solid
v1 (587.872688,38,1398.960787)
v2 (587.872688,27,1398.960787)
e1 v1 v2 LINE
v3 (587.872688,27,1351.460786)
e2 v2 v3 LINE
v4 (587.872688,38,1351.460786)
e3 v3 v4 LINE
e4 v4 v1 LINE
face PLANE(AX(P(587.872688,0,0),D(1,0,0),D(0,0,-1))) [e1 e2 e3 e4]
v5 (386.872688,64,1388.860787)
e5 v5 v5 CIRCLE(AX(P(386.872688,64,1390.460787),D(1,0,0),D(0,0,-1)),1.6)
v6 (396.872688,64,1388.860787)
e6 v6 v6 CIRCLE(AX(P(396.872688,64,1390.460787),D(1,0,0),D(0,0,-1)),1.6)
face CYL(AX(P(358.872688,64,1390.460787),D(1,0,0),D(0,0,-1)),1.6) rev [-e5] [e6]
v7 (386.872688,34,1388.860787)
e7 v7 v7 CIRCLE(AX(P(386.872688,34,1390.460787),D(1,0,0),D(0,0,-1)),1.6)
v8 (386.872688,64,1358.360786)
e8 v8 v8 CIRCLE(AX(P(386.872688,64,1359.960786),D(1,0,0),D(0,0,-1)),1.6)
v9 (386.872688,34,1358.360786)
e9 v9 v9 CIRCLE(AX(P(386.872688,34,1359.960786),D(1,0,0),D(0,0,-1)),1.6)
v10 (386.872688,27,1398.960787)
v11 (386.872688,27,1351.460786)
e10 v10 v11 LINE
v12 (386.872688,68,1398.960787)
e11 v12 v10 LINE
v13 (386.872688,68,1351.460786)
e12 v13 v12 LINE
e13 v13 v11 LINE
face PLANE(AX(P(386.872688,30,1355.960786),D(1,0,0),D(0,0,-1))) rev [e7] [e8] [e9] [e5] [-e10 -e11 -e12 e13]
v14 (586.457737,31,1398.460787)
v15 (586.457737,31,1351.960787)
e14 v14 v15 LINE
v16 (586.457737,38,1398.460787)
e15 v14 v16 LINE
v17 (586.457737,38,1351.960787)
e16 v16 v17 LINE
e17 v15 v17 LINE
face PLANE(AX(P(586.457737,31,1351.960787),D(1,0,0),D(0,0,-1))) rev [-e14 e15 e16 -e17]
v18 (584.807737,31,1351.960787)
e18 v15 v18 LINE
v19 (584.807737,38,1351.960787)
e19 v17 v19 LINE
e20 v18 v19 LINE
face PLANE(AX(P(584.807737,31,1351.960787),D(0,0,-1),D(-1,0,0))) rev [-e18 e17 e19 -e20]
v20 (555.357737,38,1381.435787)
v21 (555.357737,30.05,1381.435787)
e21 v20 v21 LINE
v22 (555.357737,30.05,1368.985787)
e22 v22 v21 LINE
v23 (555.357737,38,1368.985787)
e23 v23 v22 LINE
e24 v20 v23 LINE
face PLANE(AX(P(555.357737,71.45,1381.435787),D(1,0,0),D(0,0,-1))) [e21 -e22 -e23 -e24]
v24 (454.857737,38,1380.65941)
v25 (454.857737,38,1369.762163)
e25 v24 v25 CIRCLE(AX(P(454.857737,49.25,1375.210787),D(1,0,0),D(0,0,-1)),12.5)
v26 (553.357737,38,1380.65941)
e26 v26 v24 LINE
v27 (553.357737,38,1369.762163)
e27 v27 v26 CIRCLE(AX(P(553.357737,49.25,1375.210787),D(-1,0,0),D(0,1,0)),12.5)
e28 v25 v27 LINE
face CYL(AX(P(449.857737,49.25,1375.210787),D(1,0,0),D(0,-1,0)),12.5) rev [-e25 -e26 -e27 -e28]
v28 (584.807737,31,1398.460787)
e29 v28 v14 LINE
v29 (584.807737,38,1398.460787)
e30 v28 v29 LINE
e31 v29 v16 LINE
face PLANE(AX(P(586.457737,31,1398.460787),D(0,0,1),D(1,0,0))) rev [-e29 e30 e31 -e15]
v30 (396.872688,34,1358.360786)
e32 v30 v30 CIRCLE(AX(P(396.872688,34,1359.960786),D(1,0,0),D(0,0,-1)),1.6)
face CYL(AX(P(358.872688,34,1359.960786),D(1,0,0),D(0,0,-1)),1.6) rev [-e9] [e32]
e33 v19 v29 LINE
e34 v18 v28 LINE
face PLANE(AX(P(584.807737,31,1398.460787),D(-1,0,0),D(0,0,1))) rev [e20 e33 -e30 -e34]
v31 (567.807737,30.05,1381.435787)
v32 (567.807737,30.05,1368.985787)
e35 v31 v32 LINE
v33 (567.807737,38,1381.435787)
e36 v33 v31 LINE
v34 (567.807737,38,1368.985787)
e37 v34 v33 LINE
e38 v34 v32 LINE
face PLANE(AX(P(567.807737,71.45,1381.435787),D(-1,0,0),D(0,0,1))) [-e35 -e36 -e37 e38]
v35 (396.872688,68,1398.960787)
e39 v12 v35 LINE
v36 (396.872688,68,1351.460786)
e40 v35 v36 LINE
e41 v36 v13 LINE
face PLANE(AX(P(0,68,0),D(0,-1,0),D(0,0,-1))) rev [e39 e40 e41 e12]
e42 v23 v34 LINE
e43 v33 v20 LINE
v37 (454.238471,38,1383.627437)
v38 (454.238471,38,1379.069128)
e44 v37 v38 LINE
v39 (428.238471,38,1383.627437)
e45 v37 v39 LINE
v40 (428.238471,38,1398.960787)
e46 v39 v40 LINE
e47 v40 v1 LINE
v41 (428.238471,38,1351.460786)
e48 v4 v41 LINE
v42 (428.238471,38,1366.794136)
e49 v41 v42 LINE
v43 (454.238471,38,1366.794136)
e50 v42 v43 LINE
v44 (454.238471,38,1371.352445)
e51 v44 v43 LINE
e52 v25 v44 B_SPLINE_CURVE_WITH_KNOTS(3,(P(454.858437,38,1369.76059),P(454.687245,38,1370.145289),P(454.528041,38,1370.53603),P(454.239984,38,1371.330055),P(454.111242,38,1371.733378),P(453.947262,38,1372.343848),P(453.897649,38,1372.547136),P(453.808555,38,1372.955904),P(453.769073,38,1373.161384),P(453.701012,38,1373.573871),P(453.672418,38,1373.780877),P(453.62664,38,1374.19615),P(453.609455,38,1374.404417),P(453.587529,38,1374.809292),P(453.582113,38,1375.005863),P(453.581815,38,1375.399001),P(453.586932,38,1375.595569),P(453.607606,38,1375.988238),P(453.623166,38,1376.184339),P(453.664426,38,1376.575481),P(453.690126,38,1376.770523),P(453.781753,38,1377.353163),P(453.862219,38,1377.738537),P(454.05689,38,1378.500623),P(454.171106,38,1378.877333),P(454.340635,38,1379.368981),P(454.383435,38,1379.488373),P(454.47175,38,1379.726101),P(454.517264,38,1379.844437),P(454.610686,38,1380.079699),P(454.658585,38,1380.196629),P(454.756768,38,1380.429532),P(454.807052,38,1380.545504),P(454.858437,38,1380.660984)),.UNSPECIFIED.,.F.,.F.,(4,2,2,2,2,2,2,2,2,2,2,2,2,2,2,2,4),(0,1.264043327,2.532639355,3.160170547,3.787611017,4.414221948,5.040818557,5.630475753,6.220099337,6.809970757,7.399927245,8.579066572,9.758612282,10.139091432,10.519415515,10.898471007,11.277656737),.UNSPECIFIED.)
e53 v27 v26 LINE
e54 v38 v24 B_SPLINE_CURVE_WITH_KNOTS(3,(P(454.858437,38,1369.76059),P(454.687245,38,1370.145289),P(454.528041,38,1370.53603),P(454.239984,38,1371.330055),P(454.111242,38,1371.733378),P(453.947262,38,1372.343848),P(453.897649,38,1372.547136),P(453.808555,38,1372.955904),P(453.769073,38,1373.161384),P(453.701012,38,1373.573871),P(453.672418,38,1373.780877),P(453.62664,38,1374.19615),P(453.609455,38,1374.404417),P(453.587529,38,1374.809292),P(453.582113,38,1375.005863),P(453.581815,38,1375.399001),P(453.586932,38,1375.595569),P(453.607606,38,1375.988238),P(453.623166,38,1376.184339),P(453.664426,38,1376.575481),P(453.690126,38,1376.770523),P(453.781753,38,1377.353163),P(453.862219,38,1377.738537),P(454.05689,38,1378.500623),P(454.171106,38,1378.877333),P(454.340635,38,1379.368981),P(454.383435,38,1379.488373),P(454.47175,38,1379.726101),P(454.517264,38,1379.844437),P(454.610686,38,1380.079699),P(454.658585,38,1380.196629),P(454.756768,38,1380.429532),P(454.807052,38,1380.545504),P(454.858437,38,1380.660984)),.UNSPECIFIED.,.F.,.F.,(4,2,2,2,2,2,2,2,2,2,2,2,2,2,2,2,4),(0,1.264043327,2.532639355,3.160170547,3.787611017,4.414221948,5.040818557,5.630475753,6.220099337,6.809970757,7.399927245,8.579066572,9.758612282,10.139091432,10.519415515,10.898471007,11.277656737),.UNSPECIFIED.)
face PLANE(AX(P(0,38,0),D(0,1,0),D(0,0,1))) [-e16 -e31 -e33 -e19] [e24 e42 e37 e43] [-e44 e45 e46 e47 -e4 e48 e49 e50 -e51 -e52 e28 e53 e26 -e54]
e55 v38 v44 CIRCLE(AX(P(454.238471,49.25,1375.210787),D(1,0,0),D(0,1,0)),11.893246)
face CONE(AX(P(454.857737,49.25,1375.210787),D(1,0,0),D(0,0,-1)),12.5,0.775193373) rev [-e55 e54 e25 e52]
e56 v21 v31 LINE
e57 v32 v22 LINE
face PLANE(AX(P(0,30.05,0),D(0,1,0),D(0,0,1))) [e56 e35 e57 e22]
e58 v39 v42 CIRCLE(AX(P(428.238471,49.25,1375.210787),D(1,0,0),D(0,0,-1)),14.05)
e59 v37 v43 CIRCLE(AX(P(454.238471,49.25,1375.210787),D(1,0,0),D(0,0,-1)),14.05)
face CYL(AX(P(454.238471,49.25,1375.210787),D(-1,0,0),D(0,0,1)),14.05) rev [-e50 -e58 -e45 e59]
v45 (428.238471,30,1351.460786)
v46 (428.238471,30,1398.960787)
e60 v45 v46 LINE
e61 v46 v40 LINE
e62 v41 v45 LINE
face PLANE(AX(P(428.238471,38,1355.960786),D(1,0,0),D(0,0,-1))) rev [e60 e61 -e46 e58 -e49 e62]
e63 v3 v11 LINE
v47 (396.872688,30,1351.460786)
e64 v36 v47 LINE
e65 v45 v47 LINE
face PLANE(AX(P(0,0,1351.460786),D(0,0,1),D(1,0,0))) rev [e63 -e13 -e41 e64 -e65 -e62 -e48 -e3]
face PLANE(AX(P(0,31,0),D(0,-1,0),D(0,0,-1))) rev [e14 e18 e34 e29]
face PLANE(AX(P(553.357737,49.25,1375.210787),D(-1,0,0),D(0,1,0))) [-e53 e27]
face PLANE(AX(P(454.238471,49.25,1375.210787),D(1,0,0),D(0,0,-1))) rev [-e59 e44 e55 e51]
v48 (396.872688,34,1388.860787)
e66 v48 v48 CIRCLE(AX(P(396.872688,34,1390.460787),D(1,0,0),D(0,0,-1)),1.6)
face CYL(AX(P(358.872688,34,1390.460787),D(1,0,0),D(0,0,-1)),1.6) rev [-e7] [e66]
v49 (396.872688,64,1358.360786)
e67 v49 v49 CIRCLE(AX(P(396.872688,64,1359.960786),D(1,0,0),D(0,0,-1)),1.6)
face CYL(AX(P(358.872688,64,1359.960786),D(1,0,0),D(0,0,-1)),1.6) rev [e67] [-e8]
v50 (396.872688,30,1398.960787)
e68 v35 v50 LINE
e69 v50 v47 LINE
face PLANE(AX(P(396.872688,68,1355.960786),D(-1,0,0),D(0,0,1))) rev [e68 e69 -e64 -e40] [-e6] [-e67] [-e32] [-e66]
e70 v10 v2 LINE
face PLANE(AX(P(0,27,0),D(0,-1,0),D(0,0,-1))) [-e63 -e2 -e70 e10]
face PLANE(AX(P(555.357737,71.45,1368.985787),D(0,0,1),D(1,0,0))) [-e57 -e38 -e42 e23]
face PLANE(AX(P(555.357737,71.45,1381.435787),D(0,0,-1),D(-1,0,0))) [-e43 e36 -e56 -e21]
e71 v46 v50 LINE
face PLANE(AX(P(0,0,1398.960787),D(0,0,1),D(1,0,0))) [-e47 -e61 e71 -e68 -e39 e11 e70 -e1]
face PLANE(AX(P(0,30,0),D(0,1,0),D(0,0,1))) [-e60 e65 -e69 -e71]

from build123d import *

# Parameters (mm, degrees)
SKETCH1_W               = 226
SKETCH1_H               = 84
BOSS_EXTRUDE1_DEPTH     = 20
SKETCH9_W               = 215
SKETCH9_H               = 38.50000016
BOSS_EXTRUDE2_DEPTH     = 10
SKETCH12_W              = 10
SKETCH12_H              = 38.50000016
BOSS_EXTRUDE4_DEPTH     = 38
SKETCH14_R              = 1.6
CUT_EXTRUDE2_DEPTH      = 38
SKETCH18_W              = 173.6342166
SKETCH18_H              = 38.50000016
BOSS_EXTRUDE5_DEPTH     = 8
SKETCH20_W              = 226
SKETCH20_H              = 20
BOSS_EXTRUDE6_DEPTH     = 27.35
SKETCH20_4_W            = 226
SKETCH20_4_H            = 20
CUT_EXTRUDE3_DEPTH      = 27.35
SKETCH22_W              = 226
SKETCH22_H              = 20
CUT_EXTRUDE4_DEPTH      = 18.14670137
SKETCH23_W              = 38.50329863
SKETCH23_H              = 20
CUT_EXTRUDE5_DEPTH      = 11
SKETCH24_W              = 215
SKETCH24_H              = 38.50329863
CUT_EXTRUDE6_DEPTH      = 27
SKETCH27_W              = 31.3657834
SKETCH27_H              = 3
BOSS_EXTRUDE8_DEPTH     = 4.5
SKETCH28_W              = 31.3657834
SKETCH28_H              = 3
BOSS_EXTRUDE9_DEPTH     = 4.5
CUT_EXTRUDE9_DEPTH      = 5
CUT_EXTRUDE9_DEPTH_BACK = 14
SKETCH30_W              = 47.50000016
SKETCH30_H              = 11
CAVITY2_START           = 555.357736953
CAVITY2_DEPTH           = 12.45
CAVITY2_2_OUTLINE_W     = 9.75
CAVITY2_2_OUTLINE_H     = 10.05
CAVITY2_2_DEPTH         = 1.2
CAVITY2_START_2         = 566.607736953
CAVITY2_3_OUTLINE_W     = 9.75
CAVITY2_3_OUTLINE_H     = 10.05
CAVITY2_3_DEPTH         = 1.2
SKETCH32_W              = 10.05
SKETCH32_H              = 10.05
CUT_EXTRUDE14_DEPTH     = 10
SKETCH34_W              = 12.45
SKETCH34_H              = 12.45
BOSS_EXTRUDE11_DEPTH    = 3
SKETCH35_W              = 1.65
SKETCH35_H              = 46.5
CUT_EXTRUDE15_DEPTH     = 7


# Read off the part's stored shape, not the designer's step: Cavity2
with BuildPart() as part:
    # Sketch1 → Boss-Extrude1 (new body)
    with BuildSketch(Plane(origin=(375.872687737, 0, 1298.443562055), x_dir=(1, 0, 0), z_dir=(0, 1, 0))):
        with Locations((113, -81.370523073)):
            Rectangle(SKETCH1_W, SKETCH1_H)
    extrude(amount=BOSS_EXTRUDE1_DEPTH)

    # Sketch9 → Boss-Extrude2 (add)
    with BuildSketch(Plane(origin=(0, 20, 0), x_dir=(1, 0, 0), z_dir=(0, 1, 0))):
        with Locations((494.372687737, -1375.210786579)):
            Rectangle(SKETCH9_W, SKETCH9_H)
    extrude(amount=BOSS_EXTRUDE2_DEPTH)

    # Sketch12 → Boss-Extrude4 (add)
    with BuildSketch(Plane(origin=(0, 30, 0), x_dir=(1, 0, 0), z_dir=(0, 1, 0))):
        with Locations((391.872687737, -1375.210786579)):
            Rectangle(SKETCH12_W, SKETCH12_H)
    extrude(amount=BOSS_EXTRUDE4_DEPTH)

    # Sketch14 → Cut-Extrude2 (cut)
    with BuildSketch(Plane(origin=(396.872687737, 0, 0), x_dir=(0, 0, -1), z_dir=(1, 0, 0))):
        with Locations((-1390.460786659, 64)):
            Circle(SKETCH14_R)
        with Locations((-1359.960786499, 64)):
            Circle(SKETCH14_R)
        with Locations((-1390.460786659, 34)):
            Circle(SKETCH14_R)
        with Locations((-1359.960786499, 34)):
            Circle(SKETCH14_R)
    extrude(amount=-CUT_EXTRUDE2_DEPTH, mode=Mode.SUBTRACT)

    # Sketch18 → Boss-Extrude5 (add)
    with BuildSketch(Plane(origin=(0, 30, 0), x_dir=(1, 0, 0), z_dir=(0, 1, 0))):
        with Locations((515.055579437, -1375.210786579)):
            Rectangle(SKETCH18_W, SKETCH18_H)
    extrude(amount=BOSS_EXTRUDE5_DEPTH)

    # Sketch20 → Boss-Extrude6 (add)
    with BuildSketch(Plane.XY.offset(1421.814085128)):
        with Locations((488.872687737, 10)):
            Rectangle(SKETCH20_W, SKETCH20_H)
    extrude(amount=-BOSS_EXTRUDE6_DEPTH)

    # Sketch20<4> → Cut-Extrude3 (cut)
    with BuildSketch(Plane.XY.offset(1421.814085128)):
        with Locations((488.872687737, 10)):
            Rectangle(SKETCH20_4_W, SKETCH20_4_H)
    extrude(amount=-CUT_EXTRUDE3_DEPTH, mode=Mode.SUBTRACT)

    # Sketch22 → Cut-Extrude4 (cut)
    with BuildSketch(Plane(origin=(0, 0, 1337.814085128), x_dir=(-1, 0, 0), z_dir=(0, 0, -1))):
        with Locations((-488.872687737, 10)):
            Rectangle(SKETCH22_W, SKETCH22_H)
    extrude(amount=-CUT_EXTRUDE4_DEPTH, mode=Mode.SUBTRACT)

    # Sketch23 → Cut-Extrude5 (cut)
    with BuildSketch(Plane.ZY.offset(-375.872687737)):
        with Locations((1375.212435813, 10)):
            Rectangle(SKETCH23_W, SKETCH23_H)
    extrude(amount=-CUT_EXTRUDE5_DEPTH, mode=Mode.SUBTRACT)

    # Sketch24 → Cut-Extrude6 (cut)
    with BuildSketch(Plane.XZ):
        with Locations((494.372687737, 1375.212435813)):
            Rectangle(SKETCH24_W, SKETCH24_H)
    extrude(amount=-CUT_EXTRUDE6_DEPTH, mode=Mode.SUBTRACT)

    # Sketch27 → Boss-Extrude8 (add)
    with BuildSketch(Plane.XY.offset(1394.460786659)):
        Polygon((396.872687737, 68), (386.872687737, 68), (386.872687737, 27), (396.872687737, 27), (396.872687737, 30), align=None)
        with Locations((412.555579437, 28.5)):
            Rectangle(SKETCH27_W, SKETCH27_H)
        Polygon((428.238471137, 38), (428.238471137, 30), (428.238471137, 27), (601.872687737, 27), (601.872687737, 38), align=None)
    extrude(amount=BOSS_EXTRUDE8_DEPTH)

    # Sketch28 → Boss-Extrude9 (add)
    with BuildSketch(Plane(origin=(0, 0, 1355.960786499), x_dir=(-1, 0, 0), z_dir=(0, 0, -1))):
        Polygon((-428.238471137, 38), (-601.872687737, 38), (-601.872687737, 27), (-428.238471137, 27), (-428.238471137, 30), align=None)
        with Locations((-412.555579437, 28.5)):
            Rectangle(SKETCH28_W, SKETCH28_H)
        Polygon((-396.872687737, 68), (-396.872687737, 30), (-396.872687737, 27), (-386.872687737, 27), (-386.872687737, 68), align=None)
    extrude(amount=BOSS_EXTRUDE9_DEPTH)

    # Sketch30 → Cut-Extrude9 (cut, two sides: drawn at the far end of the back side and taken through both)
    with BuildSketch(Plane(origin=(601.872687737, 0, 0), x_dir=(0, 0, -1), z_dir=(1, 0, 0)).offset(-CUT_EXTRUDE9_DEPTH_BACK)):
        with Locations((-1375.210786579, 32.5)):
            Rectangle(SKETCH30_W, SKETCH30_H)
    extrude(amount=CUT_EXTRUDE9_DEPTH + CUT_EXTRUDE9_DEPTH_BACK, mode=Mode.SUBTRACT)

    # Cavity2 outline → Cavity2 (cut)
    with BuildSketch(Plane.YZ.offset(CAVITY2_START)):
        Polygon((27.05, 1368.985786659), (38, 1368.985786659), (38, 1370.185786659), (28.25, 1370.185786659), (28.25, 1380.235786659), (38, 1380.235786659), (38, 1381.435786659), (27.05, 1381.435786659), align=None)
    extrude(amount=CAVITY2_DEPTH, mode=Mode.SUBTRACT)

    # Cavity2 2 outline → Cavity2 2 (cut)
    with BuildSketch(Plane.YZ.offset(CAVITY2_START)):
        with Locations((33.125, 1375.210786659)):
            Rectangle(CAVITY2_2_OUTLINE_W, CAVITY2_2_OUTLINE_H)
    extrude(amount=CAVITY2_2_DEPTH, mode=Mode.SUBTRACT)

    # Cavity2 3 outline → Cavity2 3 (cut)
    with BuildSketch(Plane.YZ.offset(CAVITY2_START_2)):
        with Locations((33.125, 1375.210786659)):
            Rectangle(CAVITY2_3_OUTLINE_W, CAVITY2_3_OUTLINE_H)
    extrude(amount=CAVITY2_3_DEPTH, mode=Mode.SUBTRACT)

    # Cavity2 4 outline → Cavity2 4 (revolve, cut)
    with BuildSketch(Plane(origin=(0, 49.25, 1375.210786659), x_dir=(0, 1, 0), z_dir=(0, 0, -1))):
        Polygon((14.05, 428.238471137), (14.05, 454.238471137), (11.893245894, 454.238471137), (12.500000005, 454.857736959), (12.5, 553.357736953), (11.25, 553.357736953), (11.25, 428.238471137), align=None)
    revolve(axis=Axis((0, 49.25, 1375.210786659), (1, 0, 0)), mode=Mode.SUBTRACT)

    # Sketch32 → Cut-Extrude14 (cut)
    with BuildSketch(Plane(origin=(0, 38, 0), x_dir=(1, 0, 0), z_dir=(0, 1, 0))):
        with Locations((561.582736953, -1375.210786659)):
            Rectangle(SKETCH32_W, SKETCH32_H)
    extrude(amount=-CUT_EXTRUDE14_DEPTH, mode=Mode.SUBTRACT)

    # Sketch34 → Boss-Extrude11 (add)
    with BuildSketch(Plane(origin=(0, 27.05, 0), x_dir=(1, 0, 0), z_dir=(0, 1, 0))):
        with Locations((561.582736953, -1375.210786659)):
            Rectangle(SKETCH34_W, SKETCH34_H)
    extrude(amount=BOSS_EXTRUDE11_DEPTH)

    # Sketch35 → Cut-Extrude15 (cut)
    with BuildSketch(Plane(origin=(0, 38, 0), x_dir=(1, 0, 0), z_dir=(0, 1, 0))):
        with Locations((585.632736953, -1375.210786659)):
            Rectangle(SKETCH35_W, SKETCH35_H)
    extrude(amount=-CUT_EXTRUDE15_DEPTH, mode=Mode.SUBTRACT)


solid = part.part
